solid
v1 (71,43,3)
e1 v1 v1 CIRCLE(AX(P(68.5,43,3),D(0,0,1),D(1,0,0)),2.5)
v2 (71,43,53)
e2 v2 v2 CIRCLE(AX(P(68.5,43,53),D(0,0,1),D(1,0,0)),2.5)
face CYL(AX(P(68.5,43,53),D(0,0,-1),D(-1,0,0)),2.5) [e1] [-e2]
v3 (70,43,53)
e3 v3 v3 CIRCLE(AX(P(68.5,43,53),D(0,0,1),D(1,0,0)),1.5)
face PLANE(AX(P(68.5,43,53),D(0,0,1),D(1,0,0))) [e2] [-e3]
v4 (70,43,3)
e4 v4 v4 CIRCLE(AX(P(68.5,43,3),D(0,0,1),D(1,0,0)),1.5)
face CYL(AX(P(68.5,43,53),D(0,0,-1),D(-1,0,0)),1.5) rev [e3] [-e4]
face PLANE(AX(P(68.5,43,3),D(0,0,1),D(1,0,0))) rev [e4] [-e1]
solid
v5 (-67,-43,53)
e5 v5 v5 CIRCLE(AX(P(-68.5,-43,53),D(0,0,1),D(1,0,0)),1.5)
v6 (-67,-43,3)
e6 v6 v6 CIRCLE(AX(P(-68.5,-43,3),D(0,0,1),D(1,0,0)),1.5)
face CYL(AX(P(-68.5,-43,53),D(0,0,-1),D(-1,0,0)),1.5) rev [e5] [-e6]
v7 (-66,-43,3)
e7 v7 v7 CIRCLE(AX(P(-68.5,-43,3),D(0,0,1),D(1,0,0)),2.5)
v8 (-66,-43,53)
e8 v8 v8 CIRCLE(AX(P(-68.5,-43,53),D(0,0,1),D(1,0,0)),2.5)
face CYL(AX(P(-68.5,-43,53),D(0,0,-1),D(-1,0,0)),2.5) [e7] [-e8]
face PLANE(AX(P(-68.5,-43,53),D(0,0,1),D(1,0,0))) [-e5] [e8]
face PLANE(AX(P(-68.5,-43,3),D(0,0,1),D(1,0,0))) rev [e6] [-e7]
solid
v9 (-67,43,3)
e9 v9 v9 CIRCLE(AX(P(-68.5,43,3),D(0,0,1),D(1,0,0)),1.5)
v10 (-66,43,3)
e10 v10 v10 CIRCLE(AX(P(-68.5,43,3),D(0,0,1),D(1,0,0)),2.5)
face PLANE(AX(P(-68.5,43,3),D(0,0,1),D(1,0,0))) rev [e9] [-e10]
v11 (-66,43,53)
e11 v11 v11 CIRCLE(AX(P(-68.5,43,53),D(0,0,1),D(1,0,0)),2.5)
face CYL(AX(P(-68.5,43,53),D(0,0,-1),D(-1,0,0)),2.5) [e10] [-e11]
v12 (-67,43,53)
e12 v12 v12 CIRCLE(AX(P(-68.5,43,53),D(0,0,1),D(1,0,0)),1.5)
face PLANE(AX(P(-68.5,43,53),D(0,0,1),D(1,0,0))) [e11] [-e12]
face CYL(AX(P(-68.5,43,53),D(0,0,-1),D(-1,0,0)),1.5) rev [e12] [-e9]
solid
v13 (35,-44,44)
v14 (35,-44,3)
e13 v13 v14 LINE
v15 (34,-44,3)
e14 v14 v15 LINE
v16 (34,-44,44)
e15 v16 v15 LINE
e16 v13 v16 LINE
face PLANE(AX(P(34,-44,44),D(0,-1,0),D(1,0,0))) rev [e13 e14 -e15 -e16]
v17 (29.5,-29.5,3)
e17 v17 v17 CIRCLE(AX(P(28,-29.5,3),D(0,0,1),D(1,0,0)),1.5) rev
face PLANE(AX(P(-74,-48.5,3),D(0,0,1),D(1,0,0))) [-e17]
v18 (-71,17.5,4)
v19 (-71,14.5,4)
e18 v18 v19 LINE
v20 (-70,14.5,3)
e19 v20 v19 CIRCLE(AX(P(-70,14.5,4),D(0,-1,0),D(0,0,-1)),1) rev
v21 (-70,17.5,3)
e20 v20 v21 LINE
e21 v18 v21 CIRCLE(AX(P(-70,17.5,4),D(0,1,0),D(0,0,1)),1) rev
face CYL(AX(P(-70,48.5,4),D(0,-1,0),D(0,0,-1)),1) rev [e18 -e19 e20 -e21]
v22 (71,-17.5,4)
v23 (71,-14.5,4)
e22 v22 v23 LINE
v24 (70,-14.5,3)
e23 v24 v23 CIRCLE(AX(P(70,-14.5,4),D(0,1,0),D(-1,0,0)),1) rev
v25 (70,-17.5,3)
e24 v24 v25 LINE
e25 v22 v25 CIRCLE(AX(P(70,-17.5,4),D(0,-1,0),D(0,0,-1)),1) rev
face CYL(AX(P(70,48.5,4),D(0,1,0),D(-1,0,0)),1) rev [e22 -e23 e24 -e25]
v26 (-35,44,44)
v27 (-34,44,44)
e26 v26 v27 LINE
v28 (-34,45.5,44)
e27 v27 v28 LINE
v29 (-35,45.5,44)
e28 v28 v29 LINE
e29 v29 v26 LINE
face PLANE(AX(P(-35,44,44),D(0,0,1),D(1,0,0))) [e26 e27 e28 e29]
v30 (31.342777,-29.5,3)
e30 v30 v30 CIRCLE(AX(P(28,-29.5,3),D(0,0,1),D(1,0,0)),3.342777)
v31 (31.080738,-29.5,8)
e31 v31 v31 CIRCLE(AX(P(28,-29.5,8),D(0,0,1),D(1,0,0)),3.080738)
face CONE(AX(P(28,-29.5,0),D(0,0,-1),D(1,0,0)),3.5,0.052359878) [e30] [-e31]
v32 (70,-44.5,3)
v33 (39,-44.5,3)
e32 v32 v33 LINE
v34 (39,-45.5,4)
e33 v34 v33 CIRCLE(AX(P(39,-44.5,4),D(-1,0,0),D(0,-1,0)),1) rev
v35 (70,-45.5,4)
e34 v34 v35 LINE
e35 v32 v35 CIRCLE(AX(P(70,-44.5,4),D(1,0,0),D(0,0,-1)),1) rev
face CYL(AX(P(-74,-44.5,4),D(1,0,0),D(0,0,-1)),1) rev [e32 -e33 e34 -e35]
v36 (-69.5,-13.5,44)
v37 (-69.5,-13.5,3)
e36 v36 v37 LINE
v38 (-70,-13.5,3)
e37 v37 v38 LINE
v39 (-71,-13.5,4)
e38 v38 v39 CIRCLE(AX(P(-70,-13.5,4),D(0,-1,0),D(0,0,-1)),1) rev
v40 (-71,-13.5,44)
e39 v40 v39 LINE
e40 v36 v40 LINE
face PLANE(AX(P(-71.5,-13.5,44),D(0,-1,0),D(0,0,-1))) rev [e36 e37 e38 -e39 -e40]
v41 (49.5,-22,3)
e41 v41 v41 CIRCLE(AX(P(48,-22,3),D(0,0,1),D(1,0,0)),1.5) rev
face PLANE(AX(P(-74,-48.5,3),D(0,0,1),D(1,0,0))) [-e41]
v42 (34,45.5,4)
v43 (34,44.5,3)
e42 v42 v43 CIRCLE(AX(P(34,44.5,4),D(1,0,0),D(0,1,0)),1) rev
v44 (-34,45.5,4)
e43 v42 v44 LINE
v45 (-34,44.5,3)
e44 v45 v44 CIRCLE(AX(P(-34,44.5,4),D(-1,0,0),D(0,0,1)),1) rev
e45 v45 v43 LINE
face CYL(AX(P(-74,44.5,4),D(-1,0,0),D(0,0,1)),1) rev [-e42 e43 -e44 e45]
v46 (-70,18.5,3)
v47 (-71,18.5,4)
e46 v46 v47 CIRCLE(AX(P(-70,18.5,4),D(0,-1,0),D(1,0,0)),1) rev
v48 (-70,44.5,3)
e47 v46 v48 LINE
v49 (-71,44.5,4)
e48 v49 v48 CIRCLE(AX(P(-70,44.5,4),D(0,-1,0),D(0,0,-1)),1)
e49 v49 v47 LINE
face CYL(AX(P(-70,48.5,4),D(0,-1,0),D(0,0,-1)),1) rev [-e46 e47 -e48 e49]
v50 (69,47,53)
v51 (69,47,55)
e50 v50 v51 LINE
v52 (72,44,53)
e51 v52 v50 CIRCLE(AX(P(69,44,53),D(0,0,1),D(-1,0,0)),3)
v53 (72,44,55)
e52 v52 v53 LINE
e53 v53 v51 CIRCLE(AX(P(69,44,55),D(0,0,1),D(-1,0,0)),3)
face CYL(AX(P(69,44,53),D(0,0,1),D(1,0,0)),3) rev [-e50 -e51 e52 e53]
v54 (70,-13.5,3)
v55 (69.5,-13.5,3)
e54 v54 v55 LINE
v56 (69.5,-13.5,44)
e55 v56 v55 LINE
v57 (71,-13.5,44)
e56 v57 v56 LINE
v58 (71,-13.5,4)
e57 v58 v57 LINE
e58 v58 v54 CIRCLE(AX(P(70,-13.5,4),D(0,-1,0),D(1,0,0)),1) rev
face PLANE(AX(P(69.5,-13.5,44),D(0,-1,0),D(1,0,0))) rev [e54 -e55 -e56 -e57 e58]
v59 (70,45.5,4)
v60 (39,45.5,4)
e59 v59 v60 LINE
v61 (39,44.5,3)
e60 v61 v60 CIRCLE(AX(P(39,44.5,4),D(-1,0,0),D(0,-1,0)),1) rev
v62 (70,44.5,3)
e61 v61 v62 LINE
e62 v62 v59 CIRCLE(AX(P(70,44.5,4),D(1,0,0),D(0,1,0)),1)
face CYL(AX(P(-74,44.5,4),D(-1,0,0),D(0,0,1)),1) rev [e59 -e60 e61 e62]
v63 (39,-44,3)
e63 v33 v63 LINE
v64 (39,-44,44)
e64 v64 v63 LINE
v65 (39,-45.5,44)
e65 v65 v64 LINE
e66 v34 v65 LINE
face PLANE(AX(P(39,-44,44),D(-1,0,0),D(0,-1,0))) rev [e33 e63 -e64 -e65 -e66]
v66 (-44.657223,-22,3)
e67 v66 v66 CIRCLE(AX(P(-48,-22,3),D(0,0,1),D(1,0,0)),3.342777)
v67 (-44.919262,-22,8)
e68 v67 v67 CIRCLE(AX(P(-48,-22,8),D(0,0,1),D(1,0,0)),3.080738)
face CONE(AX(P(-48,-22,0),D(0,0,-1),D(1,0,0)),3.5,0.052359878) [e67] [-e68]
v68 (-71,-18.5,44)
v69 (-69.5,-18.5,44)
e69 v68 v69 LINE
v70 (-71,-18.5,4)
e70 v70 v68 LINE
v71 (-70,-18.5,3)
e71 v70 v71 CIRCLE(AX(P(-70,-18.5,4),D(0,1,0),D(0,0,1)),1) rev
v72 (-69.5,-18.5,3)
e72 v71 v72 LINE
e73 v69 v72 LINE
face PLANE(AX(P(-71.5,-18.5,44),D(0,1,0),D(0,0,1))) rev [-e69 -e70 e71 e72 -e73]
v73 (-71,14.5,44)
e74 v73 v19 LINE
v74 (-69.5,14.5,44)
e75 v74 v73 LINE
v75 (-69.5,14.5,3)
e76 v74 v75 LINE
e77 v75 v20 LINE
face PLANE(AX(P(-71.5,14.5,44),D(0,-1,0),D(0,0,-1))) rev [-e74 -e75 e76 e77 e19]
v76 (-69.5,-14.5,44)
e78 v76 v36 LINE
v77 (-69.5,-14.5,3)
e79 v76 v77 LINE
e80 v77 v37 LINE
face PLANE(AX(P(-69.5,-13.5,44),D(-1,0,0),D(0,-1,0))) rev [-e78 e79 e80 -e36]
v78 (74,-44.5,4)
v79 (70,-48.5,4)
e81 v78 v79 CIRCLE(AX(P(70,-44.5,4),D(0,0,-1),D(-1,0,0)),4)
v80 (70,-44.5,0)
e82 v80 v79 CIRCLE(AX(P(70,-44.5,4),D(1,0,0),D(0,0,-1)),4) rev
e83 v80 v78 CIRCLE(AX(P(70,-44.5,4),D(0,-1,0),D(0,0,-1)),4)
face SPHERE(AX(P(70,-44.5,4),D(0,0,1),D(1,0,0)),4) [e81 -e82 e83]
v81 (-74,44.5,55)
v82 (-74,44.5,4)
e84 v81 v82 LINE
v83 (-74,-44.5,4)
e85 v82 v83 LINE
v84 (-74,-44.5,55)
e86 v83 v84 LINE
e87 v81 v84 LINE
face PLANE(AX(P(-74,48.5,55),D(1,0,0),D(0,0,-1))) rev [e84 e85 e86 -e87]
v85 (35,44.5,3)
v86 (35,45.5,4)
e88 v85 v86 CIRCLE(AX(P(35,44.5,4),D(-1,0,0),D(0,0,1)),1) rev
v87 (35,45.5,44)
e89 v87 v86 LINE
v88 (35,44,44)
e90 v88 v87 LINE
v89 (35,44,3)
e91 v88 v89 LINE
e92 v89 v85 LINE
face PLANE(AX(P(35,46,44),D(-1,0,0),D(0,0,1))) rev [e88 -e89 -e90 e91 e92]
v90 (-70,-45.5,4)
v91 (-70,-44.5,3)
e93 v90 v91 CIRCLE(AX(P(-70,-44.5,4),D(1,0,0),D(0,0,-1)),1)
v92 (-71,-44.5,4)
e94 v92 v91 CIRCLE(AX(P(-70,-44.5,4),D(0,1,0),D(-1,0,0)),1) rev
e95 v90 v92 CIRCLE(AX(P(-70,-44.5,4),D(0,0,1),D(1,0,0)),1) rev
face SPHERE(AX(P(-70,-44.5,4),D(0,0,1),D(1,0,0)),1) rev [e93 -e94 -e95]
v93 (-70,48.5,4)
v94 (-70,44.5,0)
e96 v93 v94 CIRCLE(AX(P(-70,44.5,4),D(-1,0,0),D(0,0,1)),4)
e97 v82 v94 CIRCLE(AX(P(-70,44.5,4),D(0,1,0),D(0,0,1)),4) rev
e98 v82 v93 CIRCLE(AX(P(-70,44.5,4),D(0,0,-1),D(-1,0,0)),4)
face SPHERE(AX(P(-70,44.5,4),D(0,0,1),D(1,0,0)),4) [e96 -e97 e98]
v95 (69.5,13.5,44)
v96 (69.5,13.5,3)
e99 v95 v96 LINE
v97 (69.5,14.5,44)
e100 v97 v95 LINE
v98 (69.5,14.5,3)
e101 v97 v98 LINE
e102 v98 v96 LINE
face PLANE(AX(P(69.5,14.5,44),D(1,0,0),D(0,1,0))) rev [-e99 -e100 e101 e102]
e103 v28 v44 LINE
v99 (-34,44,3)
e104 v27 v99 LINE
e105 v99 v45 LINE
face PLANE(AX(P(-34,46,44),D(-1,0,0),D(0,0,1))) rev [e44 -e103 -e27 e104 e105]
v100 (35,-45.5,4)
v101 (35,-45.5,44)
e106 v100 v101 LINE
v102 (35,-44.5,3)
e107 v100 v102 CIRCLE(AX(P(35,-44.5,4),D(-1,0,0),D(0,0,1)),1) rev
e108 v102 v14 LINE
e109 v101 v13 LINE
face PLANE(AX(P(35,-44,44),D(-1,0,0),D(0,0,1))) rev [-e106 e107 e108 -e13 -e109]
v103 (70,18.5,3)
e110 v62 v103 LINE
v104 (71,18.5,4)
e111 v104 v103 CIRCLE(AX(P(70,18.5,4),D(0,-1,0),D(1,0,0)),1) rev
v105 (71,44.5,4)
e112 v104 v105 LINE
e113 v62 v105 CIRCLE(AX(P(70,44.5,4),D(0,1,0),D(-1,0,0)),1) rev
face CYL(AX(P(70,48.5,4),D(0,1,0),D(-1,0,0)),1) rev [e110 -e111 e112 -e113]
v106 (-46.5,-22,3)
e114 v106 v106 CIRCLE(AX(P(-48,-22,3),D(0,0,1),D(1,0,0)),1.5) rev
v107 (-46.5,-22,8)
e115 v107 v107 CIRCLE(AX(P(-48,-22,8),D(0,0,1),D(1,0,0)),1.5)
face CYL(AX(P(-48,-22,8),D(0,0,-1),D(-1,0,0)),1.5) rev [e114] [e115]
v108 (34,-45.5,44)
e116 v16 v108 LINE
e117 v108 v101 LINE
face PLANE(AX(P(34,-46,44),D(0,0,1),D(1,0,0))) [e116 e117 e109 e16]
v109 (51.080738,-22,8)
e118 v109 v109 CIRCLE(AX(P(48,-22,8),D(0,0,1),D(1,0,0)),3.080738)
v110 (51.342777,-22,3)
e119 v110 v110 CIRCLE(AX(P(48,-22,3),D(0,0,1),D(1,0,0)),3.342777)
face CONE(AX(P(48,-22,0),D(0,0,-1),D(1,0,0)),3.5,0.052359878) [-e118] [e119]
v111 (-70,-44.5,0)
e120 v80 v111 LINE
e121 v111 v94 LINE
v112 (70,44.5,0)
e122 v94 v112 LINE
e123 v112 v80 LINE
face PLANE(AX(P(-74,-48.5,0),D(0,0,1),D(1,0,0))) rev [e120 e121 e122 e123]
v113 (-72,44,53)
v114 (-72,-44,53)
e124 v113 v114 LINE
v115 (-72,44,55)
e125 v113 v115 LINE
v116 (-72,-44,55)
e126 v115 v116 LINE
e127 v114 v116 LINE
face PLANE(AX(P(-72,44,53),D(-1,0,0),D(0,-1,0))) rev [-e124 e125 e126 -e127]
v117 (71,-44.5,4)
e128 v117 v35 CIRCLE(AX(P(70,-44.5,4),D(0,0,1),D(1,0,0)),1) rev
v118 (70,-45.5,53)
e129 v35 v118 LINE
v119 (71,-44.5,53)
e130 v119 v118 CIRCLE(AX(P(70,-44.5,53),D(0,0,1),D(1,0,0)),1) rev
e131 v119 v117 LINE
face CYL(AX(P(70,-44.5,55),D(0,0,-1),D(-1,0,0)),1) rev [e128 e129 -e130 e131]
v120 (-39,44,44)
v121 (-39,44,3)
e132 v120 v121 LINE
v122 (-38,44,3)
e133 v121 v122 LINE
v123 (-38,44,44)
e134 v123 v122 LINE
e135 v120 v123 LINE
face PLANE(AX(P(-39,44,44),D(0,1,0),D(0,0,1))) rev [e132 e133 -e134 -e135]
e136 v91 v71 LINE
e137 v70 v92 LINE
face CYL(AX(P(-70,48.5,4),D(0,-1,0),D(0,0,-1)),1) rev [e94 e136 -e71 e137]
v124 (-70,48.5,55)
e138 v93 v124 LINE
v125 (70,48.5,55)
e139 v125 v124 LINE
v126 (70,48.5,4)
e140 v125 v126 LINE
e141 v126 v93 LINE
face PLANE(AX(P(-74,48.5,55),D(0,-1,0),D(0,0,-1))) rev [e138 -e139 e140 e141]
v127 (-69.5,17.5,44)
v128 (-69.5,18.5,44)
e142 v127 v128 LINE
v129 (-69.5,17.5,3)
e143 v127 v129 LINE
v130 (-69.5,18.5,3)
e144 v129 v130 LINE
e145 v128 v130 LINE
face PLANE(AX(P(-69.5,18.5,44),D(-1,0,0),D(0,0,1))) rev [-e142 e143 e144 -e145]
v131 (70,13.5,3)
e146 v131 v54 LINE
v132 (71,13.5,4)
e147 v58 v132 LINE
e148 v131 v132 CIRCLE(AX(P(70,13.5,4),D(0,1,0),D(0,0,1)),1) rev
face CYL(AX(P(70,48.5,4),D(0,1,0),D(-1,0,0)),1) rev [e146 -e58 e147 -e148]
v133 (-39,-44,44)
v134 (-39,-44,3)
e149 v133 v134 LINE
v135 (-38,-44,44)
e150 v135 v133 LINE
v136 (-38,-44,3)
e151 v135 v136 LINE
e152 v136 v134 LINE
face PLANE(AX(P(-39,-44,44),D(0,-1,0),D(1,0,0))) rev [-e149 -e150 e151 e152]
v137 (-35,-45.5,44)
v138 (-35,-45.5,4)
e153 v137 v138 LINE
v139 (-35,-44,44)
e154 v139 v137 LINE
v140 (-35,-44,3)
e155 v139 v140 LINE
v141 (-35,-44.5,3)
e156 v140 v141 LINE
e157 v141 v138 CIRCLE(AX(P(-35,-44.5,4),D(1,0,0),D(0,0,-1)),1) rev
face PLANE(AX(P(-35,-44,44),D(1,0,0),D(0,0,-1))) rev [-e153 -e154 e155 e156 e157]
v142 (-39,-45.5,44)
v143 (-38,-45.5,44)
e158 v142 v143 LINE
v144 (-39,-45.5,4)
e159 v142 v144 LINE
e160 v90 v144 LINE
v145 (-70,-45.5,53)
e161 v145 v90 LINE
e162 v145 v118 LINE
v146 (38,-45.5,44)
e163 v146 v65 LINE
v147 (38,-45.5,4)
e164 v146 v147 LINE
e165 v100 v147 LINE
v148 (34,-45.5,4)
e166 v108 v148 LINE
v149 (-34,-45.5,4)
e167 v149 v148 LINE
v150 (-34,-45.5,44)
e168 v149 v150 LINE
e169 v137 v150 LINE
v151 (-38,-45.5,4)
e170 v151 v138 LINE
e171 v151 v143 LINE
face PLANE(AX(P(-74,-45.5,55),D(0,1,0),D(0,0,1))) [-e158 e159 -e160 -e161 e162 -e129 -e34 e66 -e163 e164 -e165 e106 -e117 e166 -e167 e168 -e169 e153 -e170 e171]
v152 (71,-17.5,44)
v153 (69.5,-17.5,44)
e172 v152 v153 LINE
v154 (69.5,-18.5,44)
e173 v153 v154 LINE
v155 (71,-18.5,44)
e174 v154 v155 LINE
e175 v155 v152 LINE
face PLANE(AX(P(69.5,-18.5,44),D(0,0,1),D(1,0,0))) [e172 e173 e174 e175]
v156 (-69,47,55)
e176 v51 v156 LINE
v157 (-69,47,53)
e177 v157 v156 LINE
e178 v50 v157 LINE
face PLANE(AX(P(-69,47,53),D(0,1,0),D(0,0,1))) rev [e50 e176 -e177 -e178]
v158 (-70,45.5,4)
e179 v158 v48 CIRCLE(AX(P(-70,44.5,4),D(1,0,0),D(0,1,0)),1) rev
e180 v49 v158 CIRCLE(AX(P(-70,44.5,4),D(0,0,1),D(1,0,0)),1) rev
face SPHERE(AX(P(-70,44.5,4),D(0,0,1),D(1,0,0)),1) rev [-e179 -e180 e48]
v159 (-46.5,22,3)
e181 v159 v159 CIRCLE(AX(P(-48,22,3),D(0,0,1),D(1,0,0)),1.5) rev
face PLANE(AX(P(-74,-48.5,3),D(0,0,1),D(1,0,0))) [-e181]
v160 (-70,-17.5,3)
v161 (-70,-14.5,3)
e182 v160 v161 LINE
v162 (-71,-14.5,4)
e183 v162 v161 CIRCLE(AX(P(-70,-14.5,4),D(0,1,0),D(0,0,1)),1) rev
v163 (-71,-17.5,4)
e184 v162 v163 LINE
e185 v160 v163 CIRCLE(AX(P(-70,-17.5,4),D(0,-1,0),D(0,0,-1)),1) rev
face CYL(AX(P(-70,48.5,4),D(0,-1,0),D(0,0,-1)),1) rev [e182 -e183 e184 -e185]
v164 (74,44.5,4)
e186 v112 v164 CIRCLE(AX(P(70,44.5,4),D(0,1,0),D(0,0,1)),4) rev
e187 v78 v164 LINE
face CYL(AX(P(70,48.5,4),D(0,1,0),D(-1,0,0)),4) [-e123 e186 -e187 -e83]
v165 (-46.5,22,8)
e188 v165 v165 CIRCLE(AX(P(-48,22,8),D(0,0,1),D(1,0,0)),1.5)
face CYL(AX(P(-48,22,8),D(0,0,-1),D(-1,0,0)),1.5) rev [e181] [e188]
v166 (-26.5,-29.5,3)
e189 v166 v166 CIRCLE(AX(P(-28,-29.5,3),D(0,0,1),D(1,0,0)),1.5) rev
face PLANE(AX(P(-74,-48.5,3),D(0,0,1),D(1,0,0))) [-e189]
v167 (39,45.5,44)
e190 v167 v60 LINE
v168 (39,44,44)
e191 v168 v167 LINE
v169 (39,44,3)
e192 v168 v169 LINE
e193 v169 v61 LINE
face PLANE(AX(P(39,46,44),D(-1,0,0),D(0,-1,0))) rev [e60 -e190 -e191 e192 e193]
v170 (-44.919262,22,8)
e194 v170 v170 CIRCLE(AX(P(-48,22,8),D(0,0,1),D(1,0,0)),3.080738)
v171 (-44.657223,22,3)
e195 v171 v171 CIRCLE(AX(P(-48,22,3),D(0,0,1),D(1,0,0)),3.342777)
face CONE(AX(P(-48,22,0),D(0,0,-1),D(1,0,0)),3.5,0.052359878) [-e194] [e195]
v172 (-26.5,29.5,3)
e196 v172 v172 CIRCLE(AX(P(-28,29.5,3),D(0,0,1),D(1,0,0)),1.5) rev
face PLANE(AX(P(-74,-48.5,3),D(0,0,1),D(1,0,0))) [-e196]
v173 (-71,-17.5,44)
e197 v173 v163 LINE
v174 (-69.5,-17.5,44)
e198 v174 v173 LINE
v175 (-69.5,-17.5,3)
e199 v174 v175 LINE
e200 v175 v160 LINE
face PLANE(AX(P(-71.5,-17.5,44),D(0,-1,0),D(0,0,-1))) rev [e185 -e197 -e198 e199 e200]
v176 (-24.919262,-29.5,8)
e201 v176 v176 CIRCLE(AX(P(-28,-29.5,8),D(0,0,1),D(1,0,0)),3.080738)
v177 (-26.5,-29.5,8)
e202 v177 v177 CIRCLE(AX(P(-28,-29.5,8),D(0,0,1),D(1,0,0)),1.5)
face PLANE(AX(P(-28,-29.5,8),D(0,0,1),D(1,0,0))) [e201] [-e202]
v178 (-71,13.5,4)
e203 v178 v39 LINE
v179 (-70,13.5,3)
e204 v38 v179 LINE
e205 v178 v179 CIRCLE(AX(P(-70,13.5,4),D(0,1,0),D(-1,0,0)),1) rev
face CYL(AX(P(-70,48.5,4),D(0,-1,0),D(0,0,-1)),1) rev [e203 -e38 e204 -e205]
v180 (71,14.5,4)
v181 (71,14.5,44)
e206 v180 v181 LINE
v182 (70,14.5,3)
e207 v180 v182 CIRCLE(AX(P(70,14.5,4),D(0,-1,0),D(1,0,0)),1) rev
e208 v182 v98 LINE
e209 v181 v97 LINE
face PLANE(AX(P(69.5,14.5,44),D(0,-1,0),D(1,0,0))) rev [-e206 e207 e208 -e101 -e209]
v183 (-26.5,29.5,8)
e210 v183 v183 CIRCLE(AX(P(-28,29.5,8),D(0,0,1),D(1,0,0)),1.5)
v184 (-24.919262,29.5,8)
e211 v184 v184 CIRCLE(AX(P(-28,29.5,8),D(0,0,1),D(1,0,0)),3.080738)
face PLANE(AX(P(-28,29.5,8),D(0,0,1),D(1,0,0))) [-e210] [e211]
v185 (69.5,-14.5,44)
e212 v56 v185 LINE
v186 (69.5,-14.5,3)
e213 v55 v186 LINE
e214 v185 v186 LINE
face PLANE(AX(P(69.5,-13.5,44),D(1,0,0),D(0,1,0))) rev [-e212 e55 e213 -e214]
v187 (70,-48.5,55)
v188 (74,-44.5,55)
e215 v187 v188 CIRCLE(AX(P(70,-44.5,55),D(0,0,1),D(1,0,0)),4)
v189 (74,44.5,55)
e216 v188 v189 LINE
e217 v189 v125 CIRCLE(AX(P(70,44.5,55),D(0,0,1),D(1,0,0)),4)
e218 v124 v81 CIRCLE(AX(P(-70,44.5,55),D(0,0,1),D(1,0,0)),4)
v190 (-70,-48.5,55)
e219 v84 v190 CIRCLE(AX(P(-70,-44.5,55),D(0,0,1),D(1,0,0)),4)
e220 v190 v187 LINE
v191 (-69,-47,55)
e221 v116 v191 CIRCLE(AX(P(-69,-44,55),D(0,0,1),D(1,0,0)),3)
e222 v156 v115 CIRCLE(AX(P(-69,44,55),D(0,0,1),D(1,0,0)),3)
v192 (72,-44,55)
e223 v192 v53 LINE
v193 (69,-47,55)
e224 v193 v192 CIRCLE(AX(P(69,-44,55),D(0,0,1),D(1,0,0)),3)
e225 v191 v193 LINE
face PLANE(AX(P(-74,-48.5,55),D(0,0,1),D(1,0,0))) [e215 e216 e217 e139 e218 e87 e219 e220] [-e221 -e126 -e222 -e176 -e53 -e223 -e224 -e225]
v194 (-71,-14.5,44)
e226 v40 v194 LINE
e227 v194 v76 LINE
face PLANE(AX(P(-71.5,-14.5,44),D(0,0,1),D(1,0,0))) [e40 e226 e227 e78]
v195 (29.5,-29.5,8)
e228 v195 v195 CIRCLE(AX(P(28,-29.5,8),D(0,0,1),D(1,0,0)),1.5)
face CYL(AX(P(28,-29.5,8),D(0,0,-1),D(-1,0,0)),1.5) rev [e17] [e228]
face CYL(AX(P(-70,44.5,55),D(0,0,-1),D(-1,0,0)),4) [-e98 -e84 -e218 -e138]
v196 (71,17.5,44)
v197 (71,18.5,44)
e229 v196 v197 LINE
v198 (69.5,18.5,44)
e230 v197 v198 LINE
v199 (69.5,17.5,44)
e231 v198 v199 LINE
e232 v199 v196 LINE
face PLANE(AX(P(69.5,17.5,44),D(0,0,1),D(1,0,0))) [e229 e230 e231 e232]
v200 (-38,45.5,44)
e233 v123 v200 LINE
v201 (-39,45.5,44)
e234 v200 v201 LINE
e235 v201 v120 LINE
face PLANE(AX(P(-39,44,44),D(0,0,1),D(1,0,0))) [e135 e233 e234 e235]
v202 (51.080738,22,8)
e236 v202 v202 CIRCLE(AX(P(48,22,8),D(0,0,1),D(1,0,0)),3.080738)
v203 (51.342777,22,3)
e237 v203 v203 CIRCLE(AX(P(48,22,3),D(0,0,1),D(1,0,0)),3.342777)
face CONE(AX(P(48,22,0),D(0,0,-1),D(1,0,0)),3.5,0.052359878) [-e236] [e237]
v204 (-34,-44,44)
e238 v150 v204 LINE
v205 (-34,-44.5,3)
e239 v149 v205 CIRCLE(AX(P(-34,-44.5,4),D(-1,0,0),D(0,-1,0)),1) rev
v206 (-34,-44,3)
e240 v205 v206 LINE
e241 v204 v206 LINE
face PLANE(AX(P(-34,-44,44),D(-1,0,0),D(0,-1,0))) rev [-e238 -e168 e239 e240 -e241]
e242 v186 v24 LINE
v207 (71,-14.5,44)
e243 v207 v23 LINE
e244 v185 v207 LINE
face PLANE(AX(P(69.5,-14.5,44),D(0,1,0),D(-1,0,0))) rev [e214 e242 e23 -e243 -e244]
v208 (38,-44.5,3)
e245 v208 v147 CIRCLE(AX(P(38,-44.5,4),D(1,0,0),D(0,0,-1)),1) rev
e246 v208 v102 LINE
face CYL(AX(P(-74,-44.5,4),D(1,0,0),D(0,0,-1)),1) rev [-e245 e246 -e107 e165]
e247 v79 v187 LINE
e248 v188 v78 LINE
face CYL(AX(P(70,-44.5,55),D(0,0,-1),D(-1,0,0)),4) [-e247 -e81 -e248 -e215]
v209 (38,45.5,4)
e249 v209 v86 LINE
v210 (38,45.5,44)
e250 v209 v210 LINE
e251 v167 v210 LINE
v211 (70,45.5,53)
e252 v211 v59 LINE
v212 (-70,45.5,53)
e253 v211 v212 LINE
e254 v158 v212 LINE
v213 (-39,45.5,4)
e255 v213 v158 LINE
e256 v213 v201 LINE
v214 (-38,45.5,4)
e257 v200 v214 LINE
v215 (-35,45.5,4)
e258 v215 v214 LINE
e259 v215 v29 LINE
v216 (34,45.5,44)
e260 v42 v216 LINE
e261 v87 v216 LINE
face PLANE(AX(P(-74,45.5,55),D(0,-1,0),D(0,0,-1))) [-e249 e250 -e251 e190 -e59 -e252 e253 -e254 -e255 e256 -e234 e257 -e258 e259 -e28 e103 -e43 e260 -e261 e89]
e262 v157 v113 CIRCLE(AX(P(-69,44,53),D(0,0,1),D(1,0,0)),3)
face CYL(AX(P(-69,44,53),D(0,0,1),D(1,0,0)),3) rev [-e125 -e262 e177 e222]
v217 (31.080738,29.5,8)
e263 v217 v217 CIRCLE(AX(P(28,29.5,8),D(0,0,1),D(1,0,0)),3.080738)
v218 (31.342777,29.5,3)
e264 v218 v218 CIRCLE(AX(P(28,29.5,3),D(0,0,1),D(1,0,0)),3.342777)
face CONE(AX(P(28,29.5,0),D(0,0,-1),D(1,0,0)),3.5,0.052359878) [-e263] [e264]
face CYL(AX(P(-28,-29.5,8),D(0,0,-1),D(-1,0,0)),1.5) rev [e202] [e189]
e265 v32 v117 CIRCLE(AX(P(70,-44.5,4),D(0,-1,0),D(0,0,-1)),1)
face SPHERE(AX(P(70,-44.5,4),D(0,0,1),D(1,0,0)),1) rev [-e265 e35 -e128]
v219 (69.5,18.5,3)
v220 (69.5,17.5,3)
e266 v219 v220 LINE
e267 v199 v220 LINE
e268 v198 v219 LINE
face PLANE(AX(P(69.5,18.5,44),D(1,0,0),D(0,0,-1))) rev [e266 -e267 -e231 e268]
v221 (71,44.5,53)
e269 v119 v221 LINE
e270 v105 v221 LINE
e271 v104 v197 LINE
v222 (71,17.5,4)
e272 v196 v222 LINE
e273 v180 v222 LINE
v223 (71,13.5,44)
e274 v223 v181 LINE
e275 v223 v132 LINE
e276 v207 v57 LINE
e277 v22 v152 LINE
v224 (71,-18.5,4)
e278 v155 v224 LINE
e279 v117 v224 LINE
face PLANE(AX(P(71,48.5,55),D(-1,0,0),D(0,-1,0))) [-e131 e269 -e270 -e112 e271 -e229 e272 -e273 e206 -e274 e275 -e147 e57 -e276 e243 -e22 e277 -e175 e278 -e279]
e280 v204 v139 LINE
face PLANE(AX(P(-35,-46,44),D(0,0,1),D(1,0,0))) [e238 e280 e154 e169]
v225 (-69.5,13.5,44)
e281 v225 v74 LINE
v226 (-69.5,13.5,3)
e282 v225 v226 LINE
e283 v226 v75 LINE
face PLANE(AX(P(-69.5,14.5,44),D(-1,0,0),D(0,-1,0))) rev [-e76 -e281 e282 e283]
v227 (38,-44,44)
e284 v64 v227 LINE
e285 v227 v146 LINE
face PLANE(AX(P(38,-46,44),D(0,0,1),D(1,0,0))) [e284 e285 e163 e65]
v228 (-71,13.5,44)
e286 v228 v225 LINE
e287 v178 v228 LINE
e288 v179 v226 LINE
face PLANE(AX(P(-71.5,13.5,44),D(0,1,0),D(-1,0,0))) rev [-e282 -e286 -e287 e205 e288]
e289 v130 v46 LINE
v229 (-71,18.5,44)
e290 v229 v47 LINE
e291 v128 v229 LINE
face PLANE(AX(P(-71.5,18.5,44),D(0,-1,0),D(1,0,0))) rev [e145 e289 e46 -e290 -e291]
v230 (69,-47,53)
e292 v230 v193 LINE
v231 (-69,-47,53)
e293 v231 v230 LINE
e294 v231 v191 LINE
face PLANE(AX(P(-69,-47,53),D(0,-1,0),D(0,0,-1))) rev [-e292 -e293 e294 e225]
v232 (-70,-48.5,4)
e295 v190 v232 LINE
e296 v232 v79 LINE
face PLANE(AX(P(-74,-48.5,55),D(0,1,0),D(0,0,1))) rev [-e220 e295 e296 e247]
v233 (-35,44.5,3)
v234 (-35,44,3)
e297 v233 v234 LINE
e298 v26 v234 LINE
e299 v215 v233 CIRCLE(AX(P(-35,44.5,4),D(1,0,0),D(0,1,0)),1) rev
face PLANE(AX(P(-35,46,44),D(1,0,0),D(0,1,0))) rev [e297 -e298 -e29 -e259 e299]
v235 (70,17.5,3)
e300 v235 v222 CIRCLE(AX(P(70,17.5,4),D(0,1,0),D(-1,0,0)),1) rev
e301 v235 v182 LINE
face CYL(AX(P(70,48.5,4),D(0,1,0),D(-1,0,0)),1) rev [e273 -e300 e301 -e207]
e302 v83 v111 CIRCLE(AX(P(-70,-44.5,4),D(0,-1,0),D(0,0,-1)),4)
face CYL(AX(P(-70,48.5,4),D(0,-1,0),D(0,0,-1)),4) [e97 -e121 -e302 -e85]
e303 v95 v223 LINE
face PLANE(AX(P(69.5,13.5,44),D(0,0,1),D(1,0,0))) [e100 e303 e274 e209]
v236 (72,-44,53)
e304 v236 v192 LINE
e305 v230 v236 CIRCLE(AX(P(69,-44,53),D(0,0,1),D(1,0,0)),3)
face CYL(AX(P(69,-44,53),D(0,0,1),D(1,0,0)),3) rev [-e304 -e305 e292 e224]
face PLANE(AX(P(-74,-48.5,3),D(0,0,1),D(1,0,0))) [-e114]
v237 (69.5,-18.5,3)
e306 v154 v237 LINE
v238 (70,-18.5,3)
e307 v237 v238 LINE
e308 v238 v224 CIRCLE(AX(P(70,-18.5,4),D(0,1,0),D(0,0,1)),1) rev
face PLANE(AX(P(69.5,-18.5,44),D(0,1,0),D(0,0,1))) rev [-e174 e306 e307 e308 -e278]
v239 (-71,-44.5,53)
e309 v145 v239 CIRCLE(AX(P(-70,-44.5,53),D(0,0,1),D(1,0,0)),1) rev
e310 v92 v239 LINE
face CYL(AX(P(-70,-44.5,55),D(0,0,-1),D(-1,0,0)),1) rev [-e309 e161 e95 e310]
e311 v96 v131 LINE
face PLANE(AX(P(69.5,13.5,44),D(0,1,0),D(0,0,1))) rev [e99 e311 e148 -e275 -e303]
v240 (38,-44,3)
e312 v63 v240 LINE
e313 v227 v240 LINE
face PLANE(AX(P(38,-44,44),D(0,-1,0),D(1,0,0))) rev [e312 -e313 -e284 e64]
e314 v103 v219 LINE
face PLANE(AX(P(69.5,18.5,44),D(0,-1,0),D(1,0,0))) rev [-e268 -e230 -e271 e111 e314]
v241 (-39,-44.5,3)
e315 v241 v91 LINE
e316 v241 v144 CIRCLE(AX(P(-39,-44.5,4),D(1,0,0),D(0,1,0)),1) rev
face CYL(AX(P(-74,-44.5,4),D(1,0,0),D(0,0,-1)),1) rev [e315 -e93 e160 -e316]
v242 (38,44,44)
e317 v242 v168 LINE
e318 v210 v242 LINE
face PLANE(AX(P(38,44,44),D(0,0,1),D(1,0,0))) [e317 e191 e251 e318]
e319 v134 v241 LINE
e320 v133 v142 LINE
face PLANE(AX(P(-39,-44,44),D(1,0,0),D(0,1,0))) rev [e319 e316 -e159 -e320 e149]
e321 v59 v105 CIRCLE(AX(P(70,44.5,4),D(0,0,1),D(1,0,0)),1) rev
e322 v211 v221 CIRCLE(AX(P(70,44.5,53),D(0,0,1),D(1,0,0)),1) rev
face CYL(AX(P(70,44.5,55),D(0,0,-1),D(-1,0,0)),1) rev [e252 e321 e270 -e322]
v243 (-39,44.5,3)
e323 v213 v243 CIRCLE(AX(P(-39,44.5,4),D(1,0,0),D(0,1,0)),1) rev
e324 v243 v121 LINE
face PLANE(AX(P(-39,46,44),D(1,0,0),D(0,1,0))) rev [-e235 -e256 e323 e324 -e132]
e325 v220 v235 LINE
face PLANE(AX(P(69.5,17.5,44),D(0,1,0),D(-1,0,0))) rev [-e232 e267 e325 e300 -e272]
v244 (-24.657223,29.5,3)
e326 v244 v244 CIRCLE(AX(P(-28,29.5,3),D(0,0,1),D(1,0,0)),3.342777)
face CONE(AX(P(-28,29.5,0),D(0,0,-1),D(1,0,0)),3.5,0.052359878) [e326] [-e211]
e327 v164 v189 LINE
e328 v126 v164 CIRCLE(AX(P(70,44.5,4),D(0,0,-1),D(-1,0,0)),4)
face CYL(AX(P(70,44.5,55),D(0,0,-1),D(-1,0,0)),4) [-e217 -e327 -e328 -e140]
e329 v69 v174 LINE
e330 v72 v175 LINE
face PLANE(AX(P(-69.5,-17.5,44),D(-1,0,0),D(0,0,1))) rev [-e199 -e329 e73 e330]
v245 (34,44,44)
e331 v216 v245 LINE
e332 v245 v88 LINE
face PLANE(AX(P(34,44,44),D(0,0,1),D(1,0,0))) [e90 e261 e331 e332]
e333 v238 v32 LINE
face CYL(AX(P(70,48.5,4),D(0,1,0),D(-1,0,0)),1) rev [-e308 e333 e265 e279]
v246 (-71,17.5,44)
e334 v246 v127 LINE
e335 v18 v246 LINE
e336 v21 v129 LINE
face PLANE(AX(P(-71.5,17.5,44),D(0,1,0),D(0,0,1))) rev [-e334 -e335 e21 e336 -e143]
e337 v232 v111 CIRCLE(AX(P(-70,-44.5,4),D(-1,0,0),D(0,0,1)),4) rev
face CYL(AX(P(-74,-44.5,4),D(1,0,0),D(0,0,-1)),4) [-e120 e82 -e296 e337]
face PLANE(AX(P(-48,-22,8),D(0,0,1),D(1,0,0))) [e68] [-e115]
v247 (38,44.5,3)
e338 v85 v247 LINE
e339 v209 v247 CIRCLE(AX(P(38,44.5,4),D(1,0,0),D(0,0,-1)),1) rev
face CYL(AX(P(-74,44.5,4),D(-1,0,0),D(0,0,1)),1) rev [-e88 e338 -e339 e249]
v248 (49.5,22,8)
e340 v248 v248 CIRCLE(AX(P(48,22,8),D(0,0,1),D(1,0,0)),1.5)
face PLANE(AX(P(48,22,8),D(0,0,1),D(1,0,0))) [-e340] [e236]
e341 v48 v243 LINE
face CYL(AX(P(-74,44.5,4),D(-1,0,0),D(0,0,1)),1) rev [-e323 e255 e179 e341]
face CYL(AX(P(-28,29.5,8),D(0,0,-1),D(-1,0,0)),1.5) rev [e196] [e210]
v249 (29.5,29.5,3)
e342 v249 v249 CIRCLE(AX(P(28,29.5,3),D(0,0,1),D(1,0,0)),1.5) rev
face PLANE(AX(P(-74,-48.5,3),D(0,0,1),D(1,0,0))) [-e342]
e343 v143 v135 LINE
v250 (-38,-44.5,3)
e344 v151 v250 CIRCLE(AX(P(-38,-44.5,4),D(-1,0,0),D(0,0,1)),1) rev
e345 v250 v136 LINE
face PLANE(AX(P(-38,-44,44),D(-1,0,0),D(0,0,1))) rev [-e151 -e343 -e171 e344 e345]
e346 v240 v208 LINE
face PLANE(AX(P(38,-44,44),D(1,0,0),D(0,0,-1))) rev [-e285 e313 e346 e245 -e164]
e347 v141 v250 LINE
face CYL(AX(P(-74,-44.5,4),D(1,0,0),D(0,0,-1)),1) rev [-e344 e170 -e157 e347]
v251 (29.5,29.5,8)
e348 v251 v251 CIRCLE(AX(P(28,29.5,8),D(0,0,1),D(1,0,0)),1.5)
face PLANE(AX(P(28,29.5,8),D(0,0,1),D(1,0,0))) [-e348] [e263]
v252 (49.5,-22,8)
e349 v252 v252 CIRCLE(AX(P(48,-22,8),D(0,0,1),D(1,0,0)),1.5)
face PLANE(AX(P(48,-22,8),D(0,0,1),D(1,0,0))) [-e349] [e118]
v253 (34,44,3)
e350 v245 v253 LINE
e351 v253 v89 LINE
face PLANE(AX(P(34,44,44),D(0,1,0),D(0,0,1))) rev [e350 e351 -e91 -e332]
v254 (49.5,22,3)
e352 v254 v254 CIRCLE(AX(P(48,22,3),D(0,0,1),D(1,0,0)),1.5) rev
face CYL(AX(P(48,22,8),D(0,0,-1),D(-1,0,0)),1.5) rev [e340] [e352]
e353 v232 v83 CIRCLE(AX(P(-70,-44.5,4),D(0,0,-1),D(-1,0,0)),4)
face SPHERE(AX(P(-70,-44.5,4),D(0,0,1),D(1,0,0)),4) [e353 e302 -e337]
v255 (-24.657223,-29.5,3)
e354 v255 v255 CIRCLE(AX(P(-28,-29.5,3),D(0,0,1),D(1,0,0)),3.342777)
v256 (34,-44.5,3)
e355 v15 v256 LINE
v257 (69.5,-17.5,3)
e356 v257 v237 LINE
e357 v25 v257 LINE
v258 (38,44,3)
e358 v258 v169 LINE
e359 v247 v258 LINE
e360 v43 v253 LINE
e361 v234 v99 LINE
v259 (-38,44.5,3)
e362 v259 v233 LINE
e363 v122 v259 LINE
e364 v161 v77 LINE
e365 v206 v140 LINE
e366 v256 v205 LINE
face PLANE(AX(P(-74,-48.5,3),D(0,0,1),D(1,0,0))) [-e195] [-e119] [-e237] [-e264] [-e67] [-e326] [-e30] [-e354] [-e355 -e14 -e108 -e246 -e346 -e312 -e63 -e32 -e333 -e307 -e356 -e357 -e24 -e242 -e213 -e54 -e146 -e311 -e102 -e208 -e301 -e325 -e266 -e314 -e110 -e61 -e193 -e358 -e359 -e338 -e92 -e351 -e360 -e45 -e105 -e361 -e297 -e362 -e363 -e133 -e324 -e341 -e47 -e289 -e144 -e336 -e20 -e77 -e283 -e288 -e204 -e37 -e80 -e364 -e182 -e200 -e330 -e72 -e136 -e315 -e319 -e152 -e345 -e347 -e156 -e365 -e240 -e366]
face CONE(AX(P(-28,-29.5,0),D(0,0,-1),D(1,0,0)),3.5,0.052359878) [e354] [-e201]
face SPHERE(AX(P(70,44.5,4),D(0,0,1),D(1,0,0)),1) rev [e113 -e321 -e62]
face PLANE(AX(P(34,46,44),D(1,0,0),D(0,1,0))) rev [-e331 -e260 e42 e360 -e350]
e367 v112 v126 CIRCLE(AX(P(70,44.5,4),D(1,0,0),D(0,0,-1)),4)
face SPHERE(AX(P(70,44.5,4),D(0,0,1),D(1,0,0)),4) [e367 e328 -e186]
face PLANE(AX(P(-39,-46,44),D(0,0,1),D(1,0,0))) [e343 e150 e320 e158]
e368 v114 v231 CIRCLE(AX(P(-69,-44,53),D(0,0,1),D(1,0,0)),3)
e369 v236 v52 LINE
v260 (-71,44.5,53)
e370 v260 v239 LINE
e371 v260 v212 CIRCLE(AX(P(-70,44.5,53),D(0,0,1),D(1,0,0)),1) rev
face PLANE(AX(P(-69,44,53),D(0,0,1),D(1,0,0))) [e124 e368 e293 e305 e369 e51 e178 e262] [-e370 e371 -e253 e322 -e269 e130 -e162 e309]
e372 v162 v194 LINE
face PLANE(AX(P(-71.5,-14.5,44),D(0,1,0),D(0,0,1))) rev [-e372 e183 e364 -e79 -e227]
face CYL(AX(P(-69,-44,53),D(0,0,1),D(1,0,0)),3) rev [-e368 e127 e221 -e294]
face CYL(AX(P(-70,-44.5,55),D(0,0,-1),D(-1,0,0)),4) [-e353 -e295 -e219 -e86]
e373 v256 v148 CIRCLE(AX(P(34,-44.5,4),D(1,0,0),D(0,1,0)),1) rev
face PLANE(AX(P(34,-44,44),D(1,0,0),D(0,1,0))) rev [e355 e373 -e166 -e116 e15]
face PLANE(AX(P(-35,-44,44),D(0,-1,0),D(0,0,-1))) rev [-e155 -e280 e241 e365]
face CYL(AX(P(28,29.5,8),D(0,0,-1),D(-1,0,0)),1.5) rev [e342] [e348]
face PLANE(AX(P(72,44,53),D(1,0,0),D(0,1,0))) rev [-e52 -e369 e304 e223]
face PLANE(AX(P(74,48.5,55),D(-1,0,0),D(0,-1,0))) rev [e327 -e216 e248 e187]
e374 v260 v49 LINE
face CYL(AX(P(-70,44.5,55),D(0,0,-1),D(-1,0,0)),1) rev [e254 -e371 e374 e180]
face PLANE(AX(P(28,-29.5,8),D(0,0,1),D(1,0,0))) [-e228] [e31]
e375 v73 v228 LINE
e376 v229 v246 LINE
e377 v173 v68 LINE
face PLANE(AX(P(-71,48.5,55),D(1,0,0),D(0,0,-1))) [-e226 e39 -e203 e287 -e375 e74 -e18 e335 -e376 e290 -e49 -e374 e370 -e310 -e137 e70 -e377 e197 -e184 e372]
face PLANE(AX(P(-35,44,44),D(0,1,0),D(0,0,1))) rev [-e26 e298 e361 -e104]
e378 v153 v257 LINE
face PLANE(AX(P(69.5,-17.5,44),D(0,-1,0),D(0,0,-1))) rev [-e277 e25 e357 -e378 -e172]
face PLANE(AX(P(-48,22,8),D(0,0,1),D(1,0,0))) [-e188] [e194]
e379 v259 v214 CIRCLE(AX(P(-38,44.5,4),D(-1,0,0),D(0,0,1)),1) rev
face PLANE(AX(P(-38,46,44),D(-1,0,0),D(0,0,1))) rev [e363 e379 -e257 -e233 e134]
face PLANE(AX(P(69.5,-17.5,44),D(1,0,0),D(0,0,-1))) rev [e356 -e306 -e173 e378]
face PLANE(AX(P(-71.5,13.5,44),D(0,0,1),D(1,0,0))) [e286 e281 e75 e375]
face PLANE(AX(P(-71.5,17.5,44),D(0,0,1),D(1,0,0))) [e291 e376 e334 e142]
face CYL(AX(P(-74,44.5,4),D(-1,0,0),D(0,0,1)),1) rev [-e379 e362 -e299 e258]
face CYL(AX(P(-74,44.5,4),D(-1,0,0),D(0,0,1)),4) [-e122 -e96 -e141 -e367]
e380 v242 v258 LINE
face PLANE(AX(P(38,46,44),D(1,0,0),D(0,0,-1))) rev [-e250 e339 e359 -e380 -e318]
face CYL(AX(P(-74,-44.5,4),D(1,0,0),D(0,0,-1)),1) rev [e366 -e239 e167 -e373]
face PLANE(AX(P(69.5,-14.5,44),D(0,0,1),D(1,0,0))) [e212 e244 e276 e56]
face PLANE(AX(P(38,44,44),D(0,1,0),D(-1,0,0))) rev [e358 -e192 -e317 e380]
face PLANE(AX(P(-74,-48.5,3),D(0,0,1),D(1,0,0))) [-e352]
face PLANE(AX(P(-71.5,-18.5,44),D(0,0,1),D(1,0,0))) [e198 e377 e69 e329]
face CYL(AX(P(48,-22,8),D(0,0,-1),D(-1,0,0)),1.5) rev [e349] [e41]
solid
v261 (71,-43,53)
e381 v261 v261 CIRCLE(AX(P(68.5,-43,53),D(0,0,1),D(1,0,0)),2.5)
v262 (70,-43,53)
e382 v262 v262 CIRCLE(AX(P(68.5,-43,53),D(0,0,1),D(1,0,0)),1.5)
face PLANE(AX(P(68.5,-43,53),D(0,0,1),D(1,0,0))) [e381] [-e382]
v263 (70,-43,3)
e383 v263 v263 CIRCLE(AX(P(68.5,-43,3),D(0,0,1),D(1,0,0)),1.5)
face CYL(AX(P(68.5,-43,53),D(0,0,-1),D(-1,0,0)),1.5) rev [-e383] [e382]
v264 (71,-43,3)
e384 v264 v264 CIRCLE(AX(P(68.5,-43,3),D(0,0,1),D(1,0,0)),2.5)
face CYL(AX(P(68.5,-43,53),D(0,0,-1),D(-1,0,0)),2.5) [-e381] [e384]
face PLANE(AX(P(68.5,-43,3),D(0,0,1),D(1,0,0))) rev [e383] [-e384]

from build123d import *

# Parameters (mm, degrees)
ESBO_O1_W            = 148
ESBO_O1_H            = 97
CAIXA_PB_114_2_DEPTH = 55
FILETE2_R            = 4
CASCA1_T             = -3
ESBO_O3_R            = 3.5
ESBO_O3_R_2          = 1.5
EXTRUS_O3_DEPTH      = 5
EXTRUS_O2_DEPTH      = 2
ESBO_O4_W            = 2
ESBO_O4_H            = 1
ESBO_O4_W_2          = 1
ESBO_O4_H_2          = 2
EXTRUS_O4_DEPTH      = 41
ESBO_O5_R            = 2.5
ESBO_O5_R_2          = 1.5
EXTRUS_O7_DEPTH      = 50
EXTRUS_O7_2_DEPTH    = 50
EXTRUS_O7_3_DEPTH    = 50
EXTRUS_O7_4_DEPTH    = 50


# Read off the part's stored shape, not the designer's step: Inclinação1
with BuildPart() as part:
    # Esboço1 → Caixa PB 114/2 (new body)
    with BuildSketch(Plane.XY):
        Rectangle(ESBO_O1_W, ESBO_O1_H)
    extrude(amount=CAIXA_PB_114_2_DEPTH)

    # Filete2
    filete2_edges = [part.edges().sort_by_distance(p)[0] for p in [
        (0, 48.5, 0),
        (74, 0, 0),
        (0, -48.5, 0),
        (-74, 0, 0),
        (-74, 48.5, 27.5),
        (74, 48.5, 27.5),
        (74, -48.5, 27.5),
        (-74, -48.5, 27.5),
    ]]
    fillet(filete2_edges, radius=FILETE2_R)

    # Casca1
    casca1_openings = [part.faces().sort_by_distance(p)[0] for p in [
        (0, 0, 55),
    ]]
    offset(amount=CASCA1_T, openings=casca1_openings, kind=Kind.INTERSECTION)

    # Esboço3 → Extrusão3 (add)
    # profile 1 of 8: a face of its own
    with BuildSketch(Plane.XY.offset(3)):
        with Locations((-48, 22)):
            Circle(ESBO_O3_R)
        with Locations((-48, 22)):
            Circle(ESBO_O3_R_2, mode=Mode.SUBTRACT)
    # profile 2 of 8: a face of its own
    with BuildSketch(Plane.XY.offset(3)):
        with Locations((-28, 29.5)):
            Circle(ESBO_O3_R)
        with Locations((-28, 29.5)):
            Circle(ESBO_O3_R_2, mode=Mode.SUBTRACT)
    # profile 3 of 8: a face of its own
    with BuildSketch(Plane.XY.offset(3)):
        with Locations((-28, -29.5)):
            Circle(ESBO_O3_R)
        with Locations((-28, -29.5)):
            Circle(ESBO_O3_R_2, mode=Mode.SUBTRACT)
    # profile 4 of 8: a face of its own
    with BuildSketch(Plane.XY.offset(3)):
        with Locations((-48, -22)):
            Circle(ESBO_O3_R)
        with Locations((-48, -22)):
            Circle(ESBO_O3_R_2, mode=Mode.SUBTRACT)
    # profile 5 of 8: a face of its own
    with BuildSketch(Plane.XY.offset(3)):
        with Locations((28, 29.5)):
            Circle(ESBO_O3_R)
        with Locations((28, 29.5)):
            Circle(ESBO_O3_R_2, mode=Mode.SUBTRACT)
    # profile 6 of 8: a face of its own
    with BuildSketch(Plane.XY.offset(3)):
        with Locations((48, 22)):
            Circle(ESBO_O3_R)
        with Locations((48, 22)):
            Circle(ESBO_O3_R_2, mode=Mode.SUBTRACT)
    # profile 7 of 8: a face of its own
    with BuildSketch(Plane.XY.offset(3)):
        with Locations((48, -22)):
            Circle(ESBO_O3_R)
        with Locations((48, -22)):
            Circle(ESBO_O3_R_2, mode=Mode.SUBTRACT)
    # profile 8 of 8: a face of its own
    with BuildSketch(Plane.XY.offset(3)):
        with Locations((28, -29.5)):
            Circle(ESBO_O3_R)
        with Locations((28, -29.5)):
            Circle(ESBO_O3_R_2, mode=Mode.SUBTRACT)
    extrude(amount=EXTRUS_O3_DEPTH)

    # Inclinação1 outline → Inclinação1 (revolve, cut)
    with BuildSketch(Plane(origin=(-48, 22, 0), x_dir=(1, 0, 0), z_dir=(0, -1, 0))):
        Polygon((3.080737766, 8), (3.342776662, 3), (3.5, 3), (3.5, 8), align=None)
    revolve(axis=Axis((-48, 22, 0), (0, 0, 1)), mode=Mode.SUBTRACT)

    # Inclina_o1 2 outline → Inclina_o1 2 (revolve, cut)
    with BuildSketch(Plane(origin=(-28, 29.5, 0), x_dir=(1, 0, 0), z_dir=(0, -1, 0))):
        Polygon((3.080737766, 8), (3.342776662, 3), (3.5, 3), (3.5, 8), align=None)
    revolve(axis=Axis((-28, 29.5, 0), (0, 0, 1)), mode=Mode.SUBTRACT)

    # Inclina_o1 3 outline → Inclina_o1 3 (revolve, cut)
    with BuildSketch(Plane(origin=(-28, -29.5, 0), x_dir=(1, 0, 0), z_dir=(0, -1, 0))):
        Polygon((3.080737766, 8), (3.342776662, 3), (3.5, 3), (3.5, 8), align=None)
    revolve(axis=Axis((-28, -29.5, 0), (0, 0, 1)), mode=Mode.SUBTRACT)

    # Inclina_o1 4 outline → Inclina_o1 4 (revolve, cut)
    with BuildSketch(Plane(origin=(-48, -22, 0), x_dir=(1, 0, 0), z_dir=(0, -1, 0))):
        Polygon((3.080737766, 8), (3.342776662, 3), (3.5, 3), (3.5, 8), align=None)
    revolve(axis=Axis((-48, -22, 0), (0, 0, 1)), mode=Mode.SUBTRACT)

    # Inclina_o1 5 outline → Inclina_o1 5 (revolve, cut)
    with BuildSketch(Plane(origin=(28, 29.5, 0), x_dir=(1, 0, 0), z_dir=(0, -1, 0))):
        Polygon((3.080737766, 8), (3.342776662, 3), (3.5, 3), (3.5, 8), align=None)
    revolve(axis=Axis((28, 29.5, 0), (0, 0, 1)), mode=Mode.SUBTRACT)

    # Inclina_o1 6 outline → Inclina_o1 6 (revolve, cut)
    with BuildSketch(Plane(origin=(48, 22, 0), x_dir=(1, 0, 0), z_dir=(0, -1, 0))):
        Polygon((3.080737766, 8), (3.342776662, 3), (3.5, 3), (3.5, 8), align=None)
    revolve(axis=Axis((48, 22, 0), (0, 0, 1)), mode=Mode.SUBTRACT)

    # Inclina_o1 7 outline → Inclina_o1 7 (revolve, cut)
    with BuildSketch(Plane(origin=(48, -22, 0), x_dir=(1, 0, 0), z_dir=(0, -1, 0))):
        Polygon((3.080737766, 8), (3.342776662, 3), (3.5, 3), (3.5, 8), align=None)
    revolve(axis=Axis((48, -22, 0), (0, 0, 1)), mode=Mode.SUBTRACT)

    # Inclina_o1 8 outline → Inclina_o1 8 (revolve, cut)
    with BuildSketch(Plane(origin=(28, -29.5, 0), x_dir=(1, 0, 0), z_dir=(0, -1, 0))):
        Polygon((3.080737766, 8), (3.342776662, 3), (3.5, 3), (3.5, 8), align=None)
    revolve(axis=Axis((28, -29.5, 0), (0, 0, 1)), mode=Mode.SUBTRACT)

    # Esboço2 → Extrusão2 (cut)
    with BuildSketch(Plane.XY.offset(55)):
        with BuildLine():
            Line((-69, 47), (69, 47))
            ThreePointArc((69, 47), (71.121320344, 46.121320344), (72, 44))
            Line((72, 44), (72, -44))
            ThreePointArc((72, -44), (71.121320344, -46.121320344), (69, -47))
            Line((69, -47), (-69, -47))
            ThreePointArc((-69, -47), (-71.121320344, -46.121320344), (-72, -44))
            Line((-72, -44), (-72, 44))
            ThreePointArc((-72, 44), (-71.121320344, 46.121320344), (-69, 47))
        make_face()
    extrude(amount=-EXTRUS_O2_DEPTH, mode=Mode.SUBTRACT)

    # Esboço4 → Extrusão4 (add)
    with BuildSketch(Plane.XY.offset(3)):
        with Locations((-70.5, -14)):
            Rectangle(ESBO_O4_W, ESBO_O4_H)
        with Locations((-70.5, -18)):
            Rectangle(ESBO_O4_W, ESBO_O4_H)
        with Locations((70.5, -14)):
            Rectangle(ESBO_O4_W, ESBO_O4_H)
        with Locations((70.5, -18)):
            Rectangle(ESBO_O4_W, ESBO_O4_H)
        with Locations((-70.5, 14)):
            Rectangle(ESBO_O4_W, ESBO_O4_H)
        with Locations((-70.5, 18)):
            Rectangle(ESBO_O4_W, ESBO_O4_H)
        with Locations((70.5, 18)):
            Rectangle(ESBO_O4_W, ESBO_O4_H)
        with Locations((70.5, 14)):
            Rectangle(ESBO_O4_W, ESBO_O4_H)
        with Locations((-38.5, 45)):
            Rectangle(ESBO_O4_W_2, ESBO_O4_H_2)
        with Locations((-34.5, 45)):
            Rectangle(ESBO_O4_W_2, ESBO_O4_H_2)
        with Locations((34.5, 45)):
            Rectangle(ESBO_O4_W_2, ESBO_O4_H_2)
        with Locations((38.5, 45)):
            Rectangle(ESBO_O4_W_2, ESBO_O4_H_2)
        with Locations((-38.5, -45)):
            Rectangle(ESBO_O4_W_2, ESBO_O4_H_2)
        with Locations((-34.5, -45)):
            Rectangle(ESBO_O4_W_2, ESBO_O4_H_2)
        with Locations((34.5, -45)):
            Rectangle(ESBO_O4_W_2, ESBO_O4_H_2)
        with Locations((38.5, -45)):
            Rectangle(ESBO_O4_W_2, ESBO_O4_H_2)
    extrude(amount=EXTRUS_O4_DEPTH)


with BuildPart() as body_2:
    # Esboço5 → Extrusão7 (new body)
    with BuildSketch(Plane.XY.offset(3)):
        with Locations((-68.5, 43)):
            Circle(ESBO_O5_R)
        with Locations((-68.5, 43)):
            Circle(ESBO_O5_R_2, mode=Mode.SUBTRACT)
    extrude(amount=EXTRUS_O7_DEPTH)


with BuildPart() as body_3:
    # Esboço5 → Extrus_o7 2 (new body)
    with BuildSketch(Plane.XY.offset(3)):
        with Locations((68.5, 43)):
            Circle(ESBO_O5_R)
        with Locations((68.5, 43)):
            Circle(ESBO_O5_R_2, mode=Mode.SUBTRACT)
    extrude(amount=EXTRUS_O7_2_DEPTH)


with BuildPart() as body_4:
    # Esboço5 → Extrus_o7 3 (new body)
    with BuildSketch(Plane.XY.offset(3)):
        with Locations((68.5, -43)):
            Circle(ESBO_O5_R)
        with Locations((68.5, -43)):
            Circle(ESBO_O5_R_2, mode=Mode.SUBTRACT)
    extrude(amount=EXTRUS_O7_3_DEPTH)


with BuildPart() as body_5:
    # Esboço5 → Extrus_o7 4 (new body)
    with BuildSketch(Plane.XY.offset(3)):
        with Locations((-68.5, -43)):
            Circle(ESBO_O5_R)
        with Locations((-68.5, -43)):
            Circle(ESBO_O5_R_2, mode=Mode.SUBTRACT)
    extrude(amount=EXTRUS_O7_4_DEPTH)


solid = Compound([part.part, body_2.part, body_3.part, body_4.part, body_5.part])
